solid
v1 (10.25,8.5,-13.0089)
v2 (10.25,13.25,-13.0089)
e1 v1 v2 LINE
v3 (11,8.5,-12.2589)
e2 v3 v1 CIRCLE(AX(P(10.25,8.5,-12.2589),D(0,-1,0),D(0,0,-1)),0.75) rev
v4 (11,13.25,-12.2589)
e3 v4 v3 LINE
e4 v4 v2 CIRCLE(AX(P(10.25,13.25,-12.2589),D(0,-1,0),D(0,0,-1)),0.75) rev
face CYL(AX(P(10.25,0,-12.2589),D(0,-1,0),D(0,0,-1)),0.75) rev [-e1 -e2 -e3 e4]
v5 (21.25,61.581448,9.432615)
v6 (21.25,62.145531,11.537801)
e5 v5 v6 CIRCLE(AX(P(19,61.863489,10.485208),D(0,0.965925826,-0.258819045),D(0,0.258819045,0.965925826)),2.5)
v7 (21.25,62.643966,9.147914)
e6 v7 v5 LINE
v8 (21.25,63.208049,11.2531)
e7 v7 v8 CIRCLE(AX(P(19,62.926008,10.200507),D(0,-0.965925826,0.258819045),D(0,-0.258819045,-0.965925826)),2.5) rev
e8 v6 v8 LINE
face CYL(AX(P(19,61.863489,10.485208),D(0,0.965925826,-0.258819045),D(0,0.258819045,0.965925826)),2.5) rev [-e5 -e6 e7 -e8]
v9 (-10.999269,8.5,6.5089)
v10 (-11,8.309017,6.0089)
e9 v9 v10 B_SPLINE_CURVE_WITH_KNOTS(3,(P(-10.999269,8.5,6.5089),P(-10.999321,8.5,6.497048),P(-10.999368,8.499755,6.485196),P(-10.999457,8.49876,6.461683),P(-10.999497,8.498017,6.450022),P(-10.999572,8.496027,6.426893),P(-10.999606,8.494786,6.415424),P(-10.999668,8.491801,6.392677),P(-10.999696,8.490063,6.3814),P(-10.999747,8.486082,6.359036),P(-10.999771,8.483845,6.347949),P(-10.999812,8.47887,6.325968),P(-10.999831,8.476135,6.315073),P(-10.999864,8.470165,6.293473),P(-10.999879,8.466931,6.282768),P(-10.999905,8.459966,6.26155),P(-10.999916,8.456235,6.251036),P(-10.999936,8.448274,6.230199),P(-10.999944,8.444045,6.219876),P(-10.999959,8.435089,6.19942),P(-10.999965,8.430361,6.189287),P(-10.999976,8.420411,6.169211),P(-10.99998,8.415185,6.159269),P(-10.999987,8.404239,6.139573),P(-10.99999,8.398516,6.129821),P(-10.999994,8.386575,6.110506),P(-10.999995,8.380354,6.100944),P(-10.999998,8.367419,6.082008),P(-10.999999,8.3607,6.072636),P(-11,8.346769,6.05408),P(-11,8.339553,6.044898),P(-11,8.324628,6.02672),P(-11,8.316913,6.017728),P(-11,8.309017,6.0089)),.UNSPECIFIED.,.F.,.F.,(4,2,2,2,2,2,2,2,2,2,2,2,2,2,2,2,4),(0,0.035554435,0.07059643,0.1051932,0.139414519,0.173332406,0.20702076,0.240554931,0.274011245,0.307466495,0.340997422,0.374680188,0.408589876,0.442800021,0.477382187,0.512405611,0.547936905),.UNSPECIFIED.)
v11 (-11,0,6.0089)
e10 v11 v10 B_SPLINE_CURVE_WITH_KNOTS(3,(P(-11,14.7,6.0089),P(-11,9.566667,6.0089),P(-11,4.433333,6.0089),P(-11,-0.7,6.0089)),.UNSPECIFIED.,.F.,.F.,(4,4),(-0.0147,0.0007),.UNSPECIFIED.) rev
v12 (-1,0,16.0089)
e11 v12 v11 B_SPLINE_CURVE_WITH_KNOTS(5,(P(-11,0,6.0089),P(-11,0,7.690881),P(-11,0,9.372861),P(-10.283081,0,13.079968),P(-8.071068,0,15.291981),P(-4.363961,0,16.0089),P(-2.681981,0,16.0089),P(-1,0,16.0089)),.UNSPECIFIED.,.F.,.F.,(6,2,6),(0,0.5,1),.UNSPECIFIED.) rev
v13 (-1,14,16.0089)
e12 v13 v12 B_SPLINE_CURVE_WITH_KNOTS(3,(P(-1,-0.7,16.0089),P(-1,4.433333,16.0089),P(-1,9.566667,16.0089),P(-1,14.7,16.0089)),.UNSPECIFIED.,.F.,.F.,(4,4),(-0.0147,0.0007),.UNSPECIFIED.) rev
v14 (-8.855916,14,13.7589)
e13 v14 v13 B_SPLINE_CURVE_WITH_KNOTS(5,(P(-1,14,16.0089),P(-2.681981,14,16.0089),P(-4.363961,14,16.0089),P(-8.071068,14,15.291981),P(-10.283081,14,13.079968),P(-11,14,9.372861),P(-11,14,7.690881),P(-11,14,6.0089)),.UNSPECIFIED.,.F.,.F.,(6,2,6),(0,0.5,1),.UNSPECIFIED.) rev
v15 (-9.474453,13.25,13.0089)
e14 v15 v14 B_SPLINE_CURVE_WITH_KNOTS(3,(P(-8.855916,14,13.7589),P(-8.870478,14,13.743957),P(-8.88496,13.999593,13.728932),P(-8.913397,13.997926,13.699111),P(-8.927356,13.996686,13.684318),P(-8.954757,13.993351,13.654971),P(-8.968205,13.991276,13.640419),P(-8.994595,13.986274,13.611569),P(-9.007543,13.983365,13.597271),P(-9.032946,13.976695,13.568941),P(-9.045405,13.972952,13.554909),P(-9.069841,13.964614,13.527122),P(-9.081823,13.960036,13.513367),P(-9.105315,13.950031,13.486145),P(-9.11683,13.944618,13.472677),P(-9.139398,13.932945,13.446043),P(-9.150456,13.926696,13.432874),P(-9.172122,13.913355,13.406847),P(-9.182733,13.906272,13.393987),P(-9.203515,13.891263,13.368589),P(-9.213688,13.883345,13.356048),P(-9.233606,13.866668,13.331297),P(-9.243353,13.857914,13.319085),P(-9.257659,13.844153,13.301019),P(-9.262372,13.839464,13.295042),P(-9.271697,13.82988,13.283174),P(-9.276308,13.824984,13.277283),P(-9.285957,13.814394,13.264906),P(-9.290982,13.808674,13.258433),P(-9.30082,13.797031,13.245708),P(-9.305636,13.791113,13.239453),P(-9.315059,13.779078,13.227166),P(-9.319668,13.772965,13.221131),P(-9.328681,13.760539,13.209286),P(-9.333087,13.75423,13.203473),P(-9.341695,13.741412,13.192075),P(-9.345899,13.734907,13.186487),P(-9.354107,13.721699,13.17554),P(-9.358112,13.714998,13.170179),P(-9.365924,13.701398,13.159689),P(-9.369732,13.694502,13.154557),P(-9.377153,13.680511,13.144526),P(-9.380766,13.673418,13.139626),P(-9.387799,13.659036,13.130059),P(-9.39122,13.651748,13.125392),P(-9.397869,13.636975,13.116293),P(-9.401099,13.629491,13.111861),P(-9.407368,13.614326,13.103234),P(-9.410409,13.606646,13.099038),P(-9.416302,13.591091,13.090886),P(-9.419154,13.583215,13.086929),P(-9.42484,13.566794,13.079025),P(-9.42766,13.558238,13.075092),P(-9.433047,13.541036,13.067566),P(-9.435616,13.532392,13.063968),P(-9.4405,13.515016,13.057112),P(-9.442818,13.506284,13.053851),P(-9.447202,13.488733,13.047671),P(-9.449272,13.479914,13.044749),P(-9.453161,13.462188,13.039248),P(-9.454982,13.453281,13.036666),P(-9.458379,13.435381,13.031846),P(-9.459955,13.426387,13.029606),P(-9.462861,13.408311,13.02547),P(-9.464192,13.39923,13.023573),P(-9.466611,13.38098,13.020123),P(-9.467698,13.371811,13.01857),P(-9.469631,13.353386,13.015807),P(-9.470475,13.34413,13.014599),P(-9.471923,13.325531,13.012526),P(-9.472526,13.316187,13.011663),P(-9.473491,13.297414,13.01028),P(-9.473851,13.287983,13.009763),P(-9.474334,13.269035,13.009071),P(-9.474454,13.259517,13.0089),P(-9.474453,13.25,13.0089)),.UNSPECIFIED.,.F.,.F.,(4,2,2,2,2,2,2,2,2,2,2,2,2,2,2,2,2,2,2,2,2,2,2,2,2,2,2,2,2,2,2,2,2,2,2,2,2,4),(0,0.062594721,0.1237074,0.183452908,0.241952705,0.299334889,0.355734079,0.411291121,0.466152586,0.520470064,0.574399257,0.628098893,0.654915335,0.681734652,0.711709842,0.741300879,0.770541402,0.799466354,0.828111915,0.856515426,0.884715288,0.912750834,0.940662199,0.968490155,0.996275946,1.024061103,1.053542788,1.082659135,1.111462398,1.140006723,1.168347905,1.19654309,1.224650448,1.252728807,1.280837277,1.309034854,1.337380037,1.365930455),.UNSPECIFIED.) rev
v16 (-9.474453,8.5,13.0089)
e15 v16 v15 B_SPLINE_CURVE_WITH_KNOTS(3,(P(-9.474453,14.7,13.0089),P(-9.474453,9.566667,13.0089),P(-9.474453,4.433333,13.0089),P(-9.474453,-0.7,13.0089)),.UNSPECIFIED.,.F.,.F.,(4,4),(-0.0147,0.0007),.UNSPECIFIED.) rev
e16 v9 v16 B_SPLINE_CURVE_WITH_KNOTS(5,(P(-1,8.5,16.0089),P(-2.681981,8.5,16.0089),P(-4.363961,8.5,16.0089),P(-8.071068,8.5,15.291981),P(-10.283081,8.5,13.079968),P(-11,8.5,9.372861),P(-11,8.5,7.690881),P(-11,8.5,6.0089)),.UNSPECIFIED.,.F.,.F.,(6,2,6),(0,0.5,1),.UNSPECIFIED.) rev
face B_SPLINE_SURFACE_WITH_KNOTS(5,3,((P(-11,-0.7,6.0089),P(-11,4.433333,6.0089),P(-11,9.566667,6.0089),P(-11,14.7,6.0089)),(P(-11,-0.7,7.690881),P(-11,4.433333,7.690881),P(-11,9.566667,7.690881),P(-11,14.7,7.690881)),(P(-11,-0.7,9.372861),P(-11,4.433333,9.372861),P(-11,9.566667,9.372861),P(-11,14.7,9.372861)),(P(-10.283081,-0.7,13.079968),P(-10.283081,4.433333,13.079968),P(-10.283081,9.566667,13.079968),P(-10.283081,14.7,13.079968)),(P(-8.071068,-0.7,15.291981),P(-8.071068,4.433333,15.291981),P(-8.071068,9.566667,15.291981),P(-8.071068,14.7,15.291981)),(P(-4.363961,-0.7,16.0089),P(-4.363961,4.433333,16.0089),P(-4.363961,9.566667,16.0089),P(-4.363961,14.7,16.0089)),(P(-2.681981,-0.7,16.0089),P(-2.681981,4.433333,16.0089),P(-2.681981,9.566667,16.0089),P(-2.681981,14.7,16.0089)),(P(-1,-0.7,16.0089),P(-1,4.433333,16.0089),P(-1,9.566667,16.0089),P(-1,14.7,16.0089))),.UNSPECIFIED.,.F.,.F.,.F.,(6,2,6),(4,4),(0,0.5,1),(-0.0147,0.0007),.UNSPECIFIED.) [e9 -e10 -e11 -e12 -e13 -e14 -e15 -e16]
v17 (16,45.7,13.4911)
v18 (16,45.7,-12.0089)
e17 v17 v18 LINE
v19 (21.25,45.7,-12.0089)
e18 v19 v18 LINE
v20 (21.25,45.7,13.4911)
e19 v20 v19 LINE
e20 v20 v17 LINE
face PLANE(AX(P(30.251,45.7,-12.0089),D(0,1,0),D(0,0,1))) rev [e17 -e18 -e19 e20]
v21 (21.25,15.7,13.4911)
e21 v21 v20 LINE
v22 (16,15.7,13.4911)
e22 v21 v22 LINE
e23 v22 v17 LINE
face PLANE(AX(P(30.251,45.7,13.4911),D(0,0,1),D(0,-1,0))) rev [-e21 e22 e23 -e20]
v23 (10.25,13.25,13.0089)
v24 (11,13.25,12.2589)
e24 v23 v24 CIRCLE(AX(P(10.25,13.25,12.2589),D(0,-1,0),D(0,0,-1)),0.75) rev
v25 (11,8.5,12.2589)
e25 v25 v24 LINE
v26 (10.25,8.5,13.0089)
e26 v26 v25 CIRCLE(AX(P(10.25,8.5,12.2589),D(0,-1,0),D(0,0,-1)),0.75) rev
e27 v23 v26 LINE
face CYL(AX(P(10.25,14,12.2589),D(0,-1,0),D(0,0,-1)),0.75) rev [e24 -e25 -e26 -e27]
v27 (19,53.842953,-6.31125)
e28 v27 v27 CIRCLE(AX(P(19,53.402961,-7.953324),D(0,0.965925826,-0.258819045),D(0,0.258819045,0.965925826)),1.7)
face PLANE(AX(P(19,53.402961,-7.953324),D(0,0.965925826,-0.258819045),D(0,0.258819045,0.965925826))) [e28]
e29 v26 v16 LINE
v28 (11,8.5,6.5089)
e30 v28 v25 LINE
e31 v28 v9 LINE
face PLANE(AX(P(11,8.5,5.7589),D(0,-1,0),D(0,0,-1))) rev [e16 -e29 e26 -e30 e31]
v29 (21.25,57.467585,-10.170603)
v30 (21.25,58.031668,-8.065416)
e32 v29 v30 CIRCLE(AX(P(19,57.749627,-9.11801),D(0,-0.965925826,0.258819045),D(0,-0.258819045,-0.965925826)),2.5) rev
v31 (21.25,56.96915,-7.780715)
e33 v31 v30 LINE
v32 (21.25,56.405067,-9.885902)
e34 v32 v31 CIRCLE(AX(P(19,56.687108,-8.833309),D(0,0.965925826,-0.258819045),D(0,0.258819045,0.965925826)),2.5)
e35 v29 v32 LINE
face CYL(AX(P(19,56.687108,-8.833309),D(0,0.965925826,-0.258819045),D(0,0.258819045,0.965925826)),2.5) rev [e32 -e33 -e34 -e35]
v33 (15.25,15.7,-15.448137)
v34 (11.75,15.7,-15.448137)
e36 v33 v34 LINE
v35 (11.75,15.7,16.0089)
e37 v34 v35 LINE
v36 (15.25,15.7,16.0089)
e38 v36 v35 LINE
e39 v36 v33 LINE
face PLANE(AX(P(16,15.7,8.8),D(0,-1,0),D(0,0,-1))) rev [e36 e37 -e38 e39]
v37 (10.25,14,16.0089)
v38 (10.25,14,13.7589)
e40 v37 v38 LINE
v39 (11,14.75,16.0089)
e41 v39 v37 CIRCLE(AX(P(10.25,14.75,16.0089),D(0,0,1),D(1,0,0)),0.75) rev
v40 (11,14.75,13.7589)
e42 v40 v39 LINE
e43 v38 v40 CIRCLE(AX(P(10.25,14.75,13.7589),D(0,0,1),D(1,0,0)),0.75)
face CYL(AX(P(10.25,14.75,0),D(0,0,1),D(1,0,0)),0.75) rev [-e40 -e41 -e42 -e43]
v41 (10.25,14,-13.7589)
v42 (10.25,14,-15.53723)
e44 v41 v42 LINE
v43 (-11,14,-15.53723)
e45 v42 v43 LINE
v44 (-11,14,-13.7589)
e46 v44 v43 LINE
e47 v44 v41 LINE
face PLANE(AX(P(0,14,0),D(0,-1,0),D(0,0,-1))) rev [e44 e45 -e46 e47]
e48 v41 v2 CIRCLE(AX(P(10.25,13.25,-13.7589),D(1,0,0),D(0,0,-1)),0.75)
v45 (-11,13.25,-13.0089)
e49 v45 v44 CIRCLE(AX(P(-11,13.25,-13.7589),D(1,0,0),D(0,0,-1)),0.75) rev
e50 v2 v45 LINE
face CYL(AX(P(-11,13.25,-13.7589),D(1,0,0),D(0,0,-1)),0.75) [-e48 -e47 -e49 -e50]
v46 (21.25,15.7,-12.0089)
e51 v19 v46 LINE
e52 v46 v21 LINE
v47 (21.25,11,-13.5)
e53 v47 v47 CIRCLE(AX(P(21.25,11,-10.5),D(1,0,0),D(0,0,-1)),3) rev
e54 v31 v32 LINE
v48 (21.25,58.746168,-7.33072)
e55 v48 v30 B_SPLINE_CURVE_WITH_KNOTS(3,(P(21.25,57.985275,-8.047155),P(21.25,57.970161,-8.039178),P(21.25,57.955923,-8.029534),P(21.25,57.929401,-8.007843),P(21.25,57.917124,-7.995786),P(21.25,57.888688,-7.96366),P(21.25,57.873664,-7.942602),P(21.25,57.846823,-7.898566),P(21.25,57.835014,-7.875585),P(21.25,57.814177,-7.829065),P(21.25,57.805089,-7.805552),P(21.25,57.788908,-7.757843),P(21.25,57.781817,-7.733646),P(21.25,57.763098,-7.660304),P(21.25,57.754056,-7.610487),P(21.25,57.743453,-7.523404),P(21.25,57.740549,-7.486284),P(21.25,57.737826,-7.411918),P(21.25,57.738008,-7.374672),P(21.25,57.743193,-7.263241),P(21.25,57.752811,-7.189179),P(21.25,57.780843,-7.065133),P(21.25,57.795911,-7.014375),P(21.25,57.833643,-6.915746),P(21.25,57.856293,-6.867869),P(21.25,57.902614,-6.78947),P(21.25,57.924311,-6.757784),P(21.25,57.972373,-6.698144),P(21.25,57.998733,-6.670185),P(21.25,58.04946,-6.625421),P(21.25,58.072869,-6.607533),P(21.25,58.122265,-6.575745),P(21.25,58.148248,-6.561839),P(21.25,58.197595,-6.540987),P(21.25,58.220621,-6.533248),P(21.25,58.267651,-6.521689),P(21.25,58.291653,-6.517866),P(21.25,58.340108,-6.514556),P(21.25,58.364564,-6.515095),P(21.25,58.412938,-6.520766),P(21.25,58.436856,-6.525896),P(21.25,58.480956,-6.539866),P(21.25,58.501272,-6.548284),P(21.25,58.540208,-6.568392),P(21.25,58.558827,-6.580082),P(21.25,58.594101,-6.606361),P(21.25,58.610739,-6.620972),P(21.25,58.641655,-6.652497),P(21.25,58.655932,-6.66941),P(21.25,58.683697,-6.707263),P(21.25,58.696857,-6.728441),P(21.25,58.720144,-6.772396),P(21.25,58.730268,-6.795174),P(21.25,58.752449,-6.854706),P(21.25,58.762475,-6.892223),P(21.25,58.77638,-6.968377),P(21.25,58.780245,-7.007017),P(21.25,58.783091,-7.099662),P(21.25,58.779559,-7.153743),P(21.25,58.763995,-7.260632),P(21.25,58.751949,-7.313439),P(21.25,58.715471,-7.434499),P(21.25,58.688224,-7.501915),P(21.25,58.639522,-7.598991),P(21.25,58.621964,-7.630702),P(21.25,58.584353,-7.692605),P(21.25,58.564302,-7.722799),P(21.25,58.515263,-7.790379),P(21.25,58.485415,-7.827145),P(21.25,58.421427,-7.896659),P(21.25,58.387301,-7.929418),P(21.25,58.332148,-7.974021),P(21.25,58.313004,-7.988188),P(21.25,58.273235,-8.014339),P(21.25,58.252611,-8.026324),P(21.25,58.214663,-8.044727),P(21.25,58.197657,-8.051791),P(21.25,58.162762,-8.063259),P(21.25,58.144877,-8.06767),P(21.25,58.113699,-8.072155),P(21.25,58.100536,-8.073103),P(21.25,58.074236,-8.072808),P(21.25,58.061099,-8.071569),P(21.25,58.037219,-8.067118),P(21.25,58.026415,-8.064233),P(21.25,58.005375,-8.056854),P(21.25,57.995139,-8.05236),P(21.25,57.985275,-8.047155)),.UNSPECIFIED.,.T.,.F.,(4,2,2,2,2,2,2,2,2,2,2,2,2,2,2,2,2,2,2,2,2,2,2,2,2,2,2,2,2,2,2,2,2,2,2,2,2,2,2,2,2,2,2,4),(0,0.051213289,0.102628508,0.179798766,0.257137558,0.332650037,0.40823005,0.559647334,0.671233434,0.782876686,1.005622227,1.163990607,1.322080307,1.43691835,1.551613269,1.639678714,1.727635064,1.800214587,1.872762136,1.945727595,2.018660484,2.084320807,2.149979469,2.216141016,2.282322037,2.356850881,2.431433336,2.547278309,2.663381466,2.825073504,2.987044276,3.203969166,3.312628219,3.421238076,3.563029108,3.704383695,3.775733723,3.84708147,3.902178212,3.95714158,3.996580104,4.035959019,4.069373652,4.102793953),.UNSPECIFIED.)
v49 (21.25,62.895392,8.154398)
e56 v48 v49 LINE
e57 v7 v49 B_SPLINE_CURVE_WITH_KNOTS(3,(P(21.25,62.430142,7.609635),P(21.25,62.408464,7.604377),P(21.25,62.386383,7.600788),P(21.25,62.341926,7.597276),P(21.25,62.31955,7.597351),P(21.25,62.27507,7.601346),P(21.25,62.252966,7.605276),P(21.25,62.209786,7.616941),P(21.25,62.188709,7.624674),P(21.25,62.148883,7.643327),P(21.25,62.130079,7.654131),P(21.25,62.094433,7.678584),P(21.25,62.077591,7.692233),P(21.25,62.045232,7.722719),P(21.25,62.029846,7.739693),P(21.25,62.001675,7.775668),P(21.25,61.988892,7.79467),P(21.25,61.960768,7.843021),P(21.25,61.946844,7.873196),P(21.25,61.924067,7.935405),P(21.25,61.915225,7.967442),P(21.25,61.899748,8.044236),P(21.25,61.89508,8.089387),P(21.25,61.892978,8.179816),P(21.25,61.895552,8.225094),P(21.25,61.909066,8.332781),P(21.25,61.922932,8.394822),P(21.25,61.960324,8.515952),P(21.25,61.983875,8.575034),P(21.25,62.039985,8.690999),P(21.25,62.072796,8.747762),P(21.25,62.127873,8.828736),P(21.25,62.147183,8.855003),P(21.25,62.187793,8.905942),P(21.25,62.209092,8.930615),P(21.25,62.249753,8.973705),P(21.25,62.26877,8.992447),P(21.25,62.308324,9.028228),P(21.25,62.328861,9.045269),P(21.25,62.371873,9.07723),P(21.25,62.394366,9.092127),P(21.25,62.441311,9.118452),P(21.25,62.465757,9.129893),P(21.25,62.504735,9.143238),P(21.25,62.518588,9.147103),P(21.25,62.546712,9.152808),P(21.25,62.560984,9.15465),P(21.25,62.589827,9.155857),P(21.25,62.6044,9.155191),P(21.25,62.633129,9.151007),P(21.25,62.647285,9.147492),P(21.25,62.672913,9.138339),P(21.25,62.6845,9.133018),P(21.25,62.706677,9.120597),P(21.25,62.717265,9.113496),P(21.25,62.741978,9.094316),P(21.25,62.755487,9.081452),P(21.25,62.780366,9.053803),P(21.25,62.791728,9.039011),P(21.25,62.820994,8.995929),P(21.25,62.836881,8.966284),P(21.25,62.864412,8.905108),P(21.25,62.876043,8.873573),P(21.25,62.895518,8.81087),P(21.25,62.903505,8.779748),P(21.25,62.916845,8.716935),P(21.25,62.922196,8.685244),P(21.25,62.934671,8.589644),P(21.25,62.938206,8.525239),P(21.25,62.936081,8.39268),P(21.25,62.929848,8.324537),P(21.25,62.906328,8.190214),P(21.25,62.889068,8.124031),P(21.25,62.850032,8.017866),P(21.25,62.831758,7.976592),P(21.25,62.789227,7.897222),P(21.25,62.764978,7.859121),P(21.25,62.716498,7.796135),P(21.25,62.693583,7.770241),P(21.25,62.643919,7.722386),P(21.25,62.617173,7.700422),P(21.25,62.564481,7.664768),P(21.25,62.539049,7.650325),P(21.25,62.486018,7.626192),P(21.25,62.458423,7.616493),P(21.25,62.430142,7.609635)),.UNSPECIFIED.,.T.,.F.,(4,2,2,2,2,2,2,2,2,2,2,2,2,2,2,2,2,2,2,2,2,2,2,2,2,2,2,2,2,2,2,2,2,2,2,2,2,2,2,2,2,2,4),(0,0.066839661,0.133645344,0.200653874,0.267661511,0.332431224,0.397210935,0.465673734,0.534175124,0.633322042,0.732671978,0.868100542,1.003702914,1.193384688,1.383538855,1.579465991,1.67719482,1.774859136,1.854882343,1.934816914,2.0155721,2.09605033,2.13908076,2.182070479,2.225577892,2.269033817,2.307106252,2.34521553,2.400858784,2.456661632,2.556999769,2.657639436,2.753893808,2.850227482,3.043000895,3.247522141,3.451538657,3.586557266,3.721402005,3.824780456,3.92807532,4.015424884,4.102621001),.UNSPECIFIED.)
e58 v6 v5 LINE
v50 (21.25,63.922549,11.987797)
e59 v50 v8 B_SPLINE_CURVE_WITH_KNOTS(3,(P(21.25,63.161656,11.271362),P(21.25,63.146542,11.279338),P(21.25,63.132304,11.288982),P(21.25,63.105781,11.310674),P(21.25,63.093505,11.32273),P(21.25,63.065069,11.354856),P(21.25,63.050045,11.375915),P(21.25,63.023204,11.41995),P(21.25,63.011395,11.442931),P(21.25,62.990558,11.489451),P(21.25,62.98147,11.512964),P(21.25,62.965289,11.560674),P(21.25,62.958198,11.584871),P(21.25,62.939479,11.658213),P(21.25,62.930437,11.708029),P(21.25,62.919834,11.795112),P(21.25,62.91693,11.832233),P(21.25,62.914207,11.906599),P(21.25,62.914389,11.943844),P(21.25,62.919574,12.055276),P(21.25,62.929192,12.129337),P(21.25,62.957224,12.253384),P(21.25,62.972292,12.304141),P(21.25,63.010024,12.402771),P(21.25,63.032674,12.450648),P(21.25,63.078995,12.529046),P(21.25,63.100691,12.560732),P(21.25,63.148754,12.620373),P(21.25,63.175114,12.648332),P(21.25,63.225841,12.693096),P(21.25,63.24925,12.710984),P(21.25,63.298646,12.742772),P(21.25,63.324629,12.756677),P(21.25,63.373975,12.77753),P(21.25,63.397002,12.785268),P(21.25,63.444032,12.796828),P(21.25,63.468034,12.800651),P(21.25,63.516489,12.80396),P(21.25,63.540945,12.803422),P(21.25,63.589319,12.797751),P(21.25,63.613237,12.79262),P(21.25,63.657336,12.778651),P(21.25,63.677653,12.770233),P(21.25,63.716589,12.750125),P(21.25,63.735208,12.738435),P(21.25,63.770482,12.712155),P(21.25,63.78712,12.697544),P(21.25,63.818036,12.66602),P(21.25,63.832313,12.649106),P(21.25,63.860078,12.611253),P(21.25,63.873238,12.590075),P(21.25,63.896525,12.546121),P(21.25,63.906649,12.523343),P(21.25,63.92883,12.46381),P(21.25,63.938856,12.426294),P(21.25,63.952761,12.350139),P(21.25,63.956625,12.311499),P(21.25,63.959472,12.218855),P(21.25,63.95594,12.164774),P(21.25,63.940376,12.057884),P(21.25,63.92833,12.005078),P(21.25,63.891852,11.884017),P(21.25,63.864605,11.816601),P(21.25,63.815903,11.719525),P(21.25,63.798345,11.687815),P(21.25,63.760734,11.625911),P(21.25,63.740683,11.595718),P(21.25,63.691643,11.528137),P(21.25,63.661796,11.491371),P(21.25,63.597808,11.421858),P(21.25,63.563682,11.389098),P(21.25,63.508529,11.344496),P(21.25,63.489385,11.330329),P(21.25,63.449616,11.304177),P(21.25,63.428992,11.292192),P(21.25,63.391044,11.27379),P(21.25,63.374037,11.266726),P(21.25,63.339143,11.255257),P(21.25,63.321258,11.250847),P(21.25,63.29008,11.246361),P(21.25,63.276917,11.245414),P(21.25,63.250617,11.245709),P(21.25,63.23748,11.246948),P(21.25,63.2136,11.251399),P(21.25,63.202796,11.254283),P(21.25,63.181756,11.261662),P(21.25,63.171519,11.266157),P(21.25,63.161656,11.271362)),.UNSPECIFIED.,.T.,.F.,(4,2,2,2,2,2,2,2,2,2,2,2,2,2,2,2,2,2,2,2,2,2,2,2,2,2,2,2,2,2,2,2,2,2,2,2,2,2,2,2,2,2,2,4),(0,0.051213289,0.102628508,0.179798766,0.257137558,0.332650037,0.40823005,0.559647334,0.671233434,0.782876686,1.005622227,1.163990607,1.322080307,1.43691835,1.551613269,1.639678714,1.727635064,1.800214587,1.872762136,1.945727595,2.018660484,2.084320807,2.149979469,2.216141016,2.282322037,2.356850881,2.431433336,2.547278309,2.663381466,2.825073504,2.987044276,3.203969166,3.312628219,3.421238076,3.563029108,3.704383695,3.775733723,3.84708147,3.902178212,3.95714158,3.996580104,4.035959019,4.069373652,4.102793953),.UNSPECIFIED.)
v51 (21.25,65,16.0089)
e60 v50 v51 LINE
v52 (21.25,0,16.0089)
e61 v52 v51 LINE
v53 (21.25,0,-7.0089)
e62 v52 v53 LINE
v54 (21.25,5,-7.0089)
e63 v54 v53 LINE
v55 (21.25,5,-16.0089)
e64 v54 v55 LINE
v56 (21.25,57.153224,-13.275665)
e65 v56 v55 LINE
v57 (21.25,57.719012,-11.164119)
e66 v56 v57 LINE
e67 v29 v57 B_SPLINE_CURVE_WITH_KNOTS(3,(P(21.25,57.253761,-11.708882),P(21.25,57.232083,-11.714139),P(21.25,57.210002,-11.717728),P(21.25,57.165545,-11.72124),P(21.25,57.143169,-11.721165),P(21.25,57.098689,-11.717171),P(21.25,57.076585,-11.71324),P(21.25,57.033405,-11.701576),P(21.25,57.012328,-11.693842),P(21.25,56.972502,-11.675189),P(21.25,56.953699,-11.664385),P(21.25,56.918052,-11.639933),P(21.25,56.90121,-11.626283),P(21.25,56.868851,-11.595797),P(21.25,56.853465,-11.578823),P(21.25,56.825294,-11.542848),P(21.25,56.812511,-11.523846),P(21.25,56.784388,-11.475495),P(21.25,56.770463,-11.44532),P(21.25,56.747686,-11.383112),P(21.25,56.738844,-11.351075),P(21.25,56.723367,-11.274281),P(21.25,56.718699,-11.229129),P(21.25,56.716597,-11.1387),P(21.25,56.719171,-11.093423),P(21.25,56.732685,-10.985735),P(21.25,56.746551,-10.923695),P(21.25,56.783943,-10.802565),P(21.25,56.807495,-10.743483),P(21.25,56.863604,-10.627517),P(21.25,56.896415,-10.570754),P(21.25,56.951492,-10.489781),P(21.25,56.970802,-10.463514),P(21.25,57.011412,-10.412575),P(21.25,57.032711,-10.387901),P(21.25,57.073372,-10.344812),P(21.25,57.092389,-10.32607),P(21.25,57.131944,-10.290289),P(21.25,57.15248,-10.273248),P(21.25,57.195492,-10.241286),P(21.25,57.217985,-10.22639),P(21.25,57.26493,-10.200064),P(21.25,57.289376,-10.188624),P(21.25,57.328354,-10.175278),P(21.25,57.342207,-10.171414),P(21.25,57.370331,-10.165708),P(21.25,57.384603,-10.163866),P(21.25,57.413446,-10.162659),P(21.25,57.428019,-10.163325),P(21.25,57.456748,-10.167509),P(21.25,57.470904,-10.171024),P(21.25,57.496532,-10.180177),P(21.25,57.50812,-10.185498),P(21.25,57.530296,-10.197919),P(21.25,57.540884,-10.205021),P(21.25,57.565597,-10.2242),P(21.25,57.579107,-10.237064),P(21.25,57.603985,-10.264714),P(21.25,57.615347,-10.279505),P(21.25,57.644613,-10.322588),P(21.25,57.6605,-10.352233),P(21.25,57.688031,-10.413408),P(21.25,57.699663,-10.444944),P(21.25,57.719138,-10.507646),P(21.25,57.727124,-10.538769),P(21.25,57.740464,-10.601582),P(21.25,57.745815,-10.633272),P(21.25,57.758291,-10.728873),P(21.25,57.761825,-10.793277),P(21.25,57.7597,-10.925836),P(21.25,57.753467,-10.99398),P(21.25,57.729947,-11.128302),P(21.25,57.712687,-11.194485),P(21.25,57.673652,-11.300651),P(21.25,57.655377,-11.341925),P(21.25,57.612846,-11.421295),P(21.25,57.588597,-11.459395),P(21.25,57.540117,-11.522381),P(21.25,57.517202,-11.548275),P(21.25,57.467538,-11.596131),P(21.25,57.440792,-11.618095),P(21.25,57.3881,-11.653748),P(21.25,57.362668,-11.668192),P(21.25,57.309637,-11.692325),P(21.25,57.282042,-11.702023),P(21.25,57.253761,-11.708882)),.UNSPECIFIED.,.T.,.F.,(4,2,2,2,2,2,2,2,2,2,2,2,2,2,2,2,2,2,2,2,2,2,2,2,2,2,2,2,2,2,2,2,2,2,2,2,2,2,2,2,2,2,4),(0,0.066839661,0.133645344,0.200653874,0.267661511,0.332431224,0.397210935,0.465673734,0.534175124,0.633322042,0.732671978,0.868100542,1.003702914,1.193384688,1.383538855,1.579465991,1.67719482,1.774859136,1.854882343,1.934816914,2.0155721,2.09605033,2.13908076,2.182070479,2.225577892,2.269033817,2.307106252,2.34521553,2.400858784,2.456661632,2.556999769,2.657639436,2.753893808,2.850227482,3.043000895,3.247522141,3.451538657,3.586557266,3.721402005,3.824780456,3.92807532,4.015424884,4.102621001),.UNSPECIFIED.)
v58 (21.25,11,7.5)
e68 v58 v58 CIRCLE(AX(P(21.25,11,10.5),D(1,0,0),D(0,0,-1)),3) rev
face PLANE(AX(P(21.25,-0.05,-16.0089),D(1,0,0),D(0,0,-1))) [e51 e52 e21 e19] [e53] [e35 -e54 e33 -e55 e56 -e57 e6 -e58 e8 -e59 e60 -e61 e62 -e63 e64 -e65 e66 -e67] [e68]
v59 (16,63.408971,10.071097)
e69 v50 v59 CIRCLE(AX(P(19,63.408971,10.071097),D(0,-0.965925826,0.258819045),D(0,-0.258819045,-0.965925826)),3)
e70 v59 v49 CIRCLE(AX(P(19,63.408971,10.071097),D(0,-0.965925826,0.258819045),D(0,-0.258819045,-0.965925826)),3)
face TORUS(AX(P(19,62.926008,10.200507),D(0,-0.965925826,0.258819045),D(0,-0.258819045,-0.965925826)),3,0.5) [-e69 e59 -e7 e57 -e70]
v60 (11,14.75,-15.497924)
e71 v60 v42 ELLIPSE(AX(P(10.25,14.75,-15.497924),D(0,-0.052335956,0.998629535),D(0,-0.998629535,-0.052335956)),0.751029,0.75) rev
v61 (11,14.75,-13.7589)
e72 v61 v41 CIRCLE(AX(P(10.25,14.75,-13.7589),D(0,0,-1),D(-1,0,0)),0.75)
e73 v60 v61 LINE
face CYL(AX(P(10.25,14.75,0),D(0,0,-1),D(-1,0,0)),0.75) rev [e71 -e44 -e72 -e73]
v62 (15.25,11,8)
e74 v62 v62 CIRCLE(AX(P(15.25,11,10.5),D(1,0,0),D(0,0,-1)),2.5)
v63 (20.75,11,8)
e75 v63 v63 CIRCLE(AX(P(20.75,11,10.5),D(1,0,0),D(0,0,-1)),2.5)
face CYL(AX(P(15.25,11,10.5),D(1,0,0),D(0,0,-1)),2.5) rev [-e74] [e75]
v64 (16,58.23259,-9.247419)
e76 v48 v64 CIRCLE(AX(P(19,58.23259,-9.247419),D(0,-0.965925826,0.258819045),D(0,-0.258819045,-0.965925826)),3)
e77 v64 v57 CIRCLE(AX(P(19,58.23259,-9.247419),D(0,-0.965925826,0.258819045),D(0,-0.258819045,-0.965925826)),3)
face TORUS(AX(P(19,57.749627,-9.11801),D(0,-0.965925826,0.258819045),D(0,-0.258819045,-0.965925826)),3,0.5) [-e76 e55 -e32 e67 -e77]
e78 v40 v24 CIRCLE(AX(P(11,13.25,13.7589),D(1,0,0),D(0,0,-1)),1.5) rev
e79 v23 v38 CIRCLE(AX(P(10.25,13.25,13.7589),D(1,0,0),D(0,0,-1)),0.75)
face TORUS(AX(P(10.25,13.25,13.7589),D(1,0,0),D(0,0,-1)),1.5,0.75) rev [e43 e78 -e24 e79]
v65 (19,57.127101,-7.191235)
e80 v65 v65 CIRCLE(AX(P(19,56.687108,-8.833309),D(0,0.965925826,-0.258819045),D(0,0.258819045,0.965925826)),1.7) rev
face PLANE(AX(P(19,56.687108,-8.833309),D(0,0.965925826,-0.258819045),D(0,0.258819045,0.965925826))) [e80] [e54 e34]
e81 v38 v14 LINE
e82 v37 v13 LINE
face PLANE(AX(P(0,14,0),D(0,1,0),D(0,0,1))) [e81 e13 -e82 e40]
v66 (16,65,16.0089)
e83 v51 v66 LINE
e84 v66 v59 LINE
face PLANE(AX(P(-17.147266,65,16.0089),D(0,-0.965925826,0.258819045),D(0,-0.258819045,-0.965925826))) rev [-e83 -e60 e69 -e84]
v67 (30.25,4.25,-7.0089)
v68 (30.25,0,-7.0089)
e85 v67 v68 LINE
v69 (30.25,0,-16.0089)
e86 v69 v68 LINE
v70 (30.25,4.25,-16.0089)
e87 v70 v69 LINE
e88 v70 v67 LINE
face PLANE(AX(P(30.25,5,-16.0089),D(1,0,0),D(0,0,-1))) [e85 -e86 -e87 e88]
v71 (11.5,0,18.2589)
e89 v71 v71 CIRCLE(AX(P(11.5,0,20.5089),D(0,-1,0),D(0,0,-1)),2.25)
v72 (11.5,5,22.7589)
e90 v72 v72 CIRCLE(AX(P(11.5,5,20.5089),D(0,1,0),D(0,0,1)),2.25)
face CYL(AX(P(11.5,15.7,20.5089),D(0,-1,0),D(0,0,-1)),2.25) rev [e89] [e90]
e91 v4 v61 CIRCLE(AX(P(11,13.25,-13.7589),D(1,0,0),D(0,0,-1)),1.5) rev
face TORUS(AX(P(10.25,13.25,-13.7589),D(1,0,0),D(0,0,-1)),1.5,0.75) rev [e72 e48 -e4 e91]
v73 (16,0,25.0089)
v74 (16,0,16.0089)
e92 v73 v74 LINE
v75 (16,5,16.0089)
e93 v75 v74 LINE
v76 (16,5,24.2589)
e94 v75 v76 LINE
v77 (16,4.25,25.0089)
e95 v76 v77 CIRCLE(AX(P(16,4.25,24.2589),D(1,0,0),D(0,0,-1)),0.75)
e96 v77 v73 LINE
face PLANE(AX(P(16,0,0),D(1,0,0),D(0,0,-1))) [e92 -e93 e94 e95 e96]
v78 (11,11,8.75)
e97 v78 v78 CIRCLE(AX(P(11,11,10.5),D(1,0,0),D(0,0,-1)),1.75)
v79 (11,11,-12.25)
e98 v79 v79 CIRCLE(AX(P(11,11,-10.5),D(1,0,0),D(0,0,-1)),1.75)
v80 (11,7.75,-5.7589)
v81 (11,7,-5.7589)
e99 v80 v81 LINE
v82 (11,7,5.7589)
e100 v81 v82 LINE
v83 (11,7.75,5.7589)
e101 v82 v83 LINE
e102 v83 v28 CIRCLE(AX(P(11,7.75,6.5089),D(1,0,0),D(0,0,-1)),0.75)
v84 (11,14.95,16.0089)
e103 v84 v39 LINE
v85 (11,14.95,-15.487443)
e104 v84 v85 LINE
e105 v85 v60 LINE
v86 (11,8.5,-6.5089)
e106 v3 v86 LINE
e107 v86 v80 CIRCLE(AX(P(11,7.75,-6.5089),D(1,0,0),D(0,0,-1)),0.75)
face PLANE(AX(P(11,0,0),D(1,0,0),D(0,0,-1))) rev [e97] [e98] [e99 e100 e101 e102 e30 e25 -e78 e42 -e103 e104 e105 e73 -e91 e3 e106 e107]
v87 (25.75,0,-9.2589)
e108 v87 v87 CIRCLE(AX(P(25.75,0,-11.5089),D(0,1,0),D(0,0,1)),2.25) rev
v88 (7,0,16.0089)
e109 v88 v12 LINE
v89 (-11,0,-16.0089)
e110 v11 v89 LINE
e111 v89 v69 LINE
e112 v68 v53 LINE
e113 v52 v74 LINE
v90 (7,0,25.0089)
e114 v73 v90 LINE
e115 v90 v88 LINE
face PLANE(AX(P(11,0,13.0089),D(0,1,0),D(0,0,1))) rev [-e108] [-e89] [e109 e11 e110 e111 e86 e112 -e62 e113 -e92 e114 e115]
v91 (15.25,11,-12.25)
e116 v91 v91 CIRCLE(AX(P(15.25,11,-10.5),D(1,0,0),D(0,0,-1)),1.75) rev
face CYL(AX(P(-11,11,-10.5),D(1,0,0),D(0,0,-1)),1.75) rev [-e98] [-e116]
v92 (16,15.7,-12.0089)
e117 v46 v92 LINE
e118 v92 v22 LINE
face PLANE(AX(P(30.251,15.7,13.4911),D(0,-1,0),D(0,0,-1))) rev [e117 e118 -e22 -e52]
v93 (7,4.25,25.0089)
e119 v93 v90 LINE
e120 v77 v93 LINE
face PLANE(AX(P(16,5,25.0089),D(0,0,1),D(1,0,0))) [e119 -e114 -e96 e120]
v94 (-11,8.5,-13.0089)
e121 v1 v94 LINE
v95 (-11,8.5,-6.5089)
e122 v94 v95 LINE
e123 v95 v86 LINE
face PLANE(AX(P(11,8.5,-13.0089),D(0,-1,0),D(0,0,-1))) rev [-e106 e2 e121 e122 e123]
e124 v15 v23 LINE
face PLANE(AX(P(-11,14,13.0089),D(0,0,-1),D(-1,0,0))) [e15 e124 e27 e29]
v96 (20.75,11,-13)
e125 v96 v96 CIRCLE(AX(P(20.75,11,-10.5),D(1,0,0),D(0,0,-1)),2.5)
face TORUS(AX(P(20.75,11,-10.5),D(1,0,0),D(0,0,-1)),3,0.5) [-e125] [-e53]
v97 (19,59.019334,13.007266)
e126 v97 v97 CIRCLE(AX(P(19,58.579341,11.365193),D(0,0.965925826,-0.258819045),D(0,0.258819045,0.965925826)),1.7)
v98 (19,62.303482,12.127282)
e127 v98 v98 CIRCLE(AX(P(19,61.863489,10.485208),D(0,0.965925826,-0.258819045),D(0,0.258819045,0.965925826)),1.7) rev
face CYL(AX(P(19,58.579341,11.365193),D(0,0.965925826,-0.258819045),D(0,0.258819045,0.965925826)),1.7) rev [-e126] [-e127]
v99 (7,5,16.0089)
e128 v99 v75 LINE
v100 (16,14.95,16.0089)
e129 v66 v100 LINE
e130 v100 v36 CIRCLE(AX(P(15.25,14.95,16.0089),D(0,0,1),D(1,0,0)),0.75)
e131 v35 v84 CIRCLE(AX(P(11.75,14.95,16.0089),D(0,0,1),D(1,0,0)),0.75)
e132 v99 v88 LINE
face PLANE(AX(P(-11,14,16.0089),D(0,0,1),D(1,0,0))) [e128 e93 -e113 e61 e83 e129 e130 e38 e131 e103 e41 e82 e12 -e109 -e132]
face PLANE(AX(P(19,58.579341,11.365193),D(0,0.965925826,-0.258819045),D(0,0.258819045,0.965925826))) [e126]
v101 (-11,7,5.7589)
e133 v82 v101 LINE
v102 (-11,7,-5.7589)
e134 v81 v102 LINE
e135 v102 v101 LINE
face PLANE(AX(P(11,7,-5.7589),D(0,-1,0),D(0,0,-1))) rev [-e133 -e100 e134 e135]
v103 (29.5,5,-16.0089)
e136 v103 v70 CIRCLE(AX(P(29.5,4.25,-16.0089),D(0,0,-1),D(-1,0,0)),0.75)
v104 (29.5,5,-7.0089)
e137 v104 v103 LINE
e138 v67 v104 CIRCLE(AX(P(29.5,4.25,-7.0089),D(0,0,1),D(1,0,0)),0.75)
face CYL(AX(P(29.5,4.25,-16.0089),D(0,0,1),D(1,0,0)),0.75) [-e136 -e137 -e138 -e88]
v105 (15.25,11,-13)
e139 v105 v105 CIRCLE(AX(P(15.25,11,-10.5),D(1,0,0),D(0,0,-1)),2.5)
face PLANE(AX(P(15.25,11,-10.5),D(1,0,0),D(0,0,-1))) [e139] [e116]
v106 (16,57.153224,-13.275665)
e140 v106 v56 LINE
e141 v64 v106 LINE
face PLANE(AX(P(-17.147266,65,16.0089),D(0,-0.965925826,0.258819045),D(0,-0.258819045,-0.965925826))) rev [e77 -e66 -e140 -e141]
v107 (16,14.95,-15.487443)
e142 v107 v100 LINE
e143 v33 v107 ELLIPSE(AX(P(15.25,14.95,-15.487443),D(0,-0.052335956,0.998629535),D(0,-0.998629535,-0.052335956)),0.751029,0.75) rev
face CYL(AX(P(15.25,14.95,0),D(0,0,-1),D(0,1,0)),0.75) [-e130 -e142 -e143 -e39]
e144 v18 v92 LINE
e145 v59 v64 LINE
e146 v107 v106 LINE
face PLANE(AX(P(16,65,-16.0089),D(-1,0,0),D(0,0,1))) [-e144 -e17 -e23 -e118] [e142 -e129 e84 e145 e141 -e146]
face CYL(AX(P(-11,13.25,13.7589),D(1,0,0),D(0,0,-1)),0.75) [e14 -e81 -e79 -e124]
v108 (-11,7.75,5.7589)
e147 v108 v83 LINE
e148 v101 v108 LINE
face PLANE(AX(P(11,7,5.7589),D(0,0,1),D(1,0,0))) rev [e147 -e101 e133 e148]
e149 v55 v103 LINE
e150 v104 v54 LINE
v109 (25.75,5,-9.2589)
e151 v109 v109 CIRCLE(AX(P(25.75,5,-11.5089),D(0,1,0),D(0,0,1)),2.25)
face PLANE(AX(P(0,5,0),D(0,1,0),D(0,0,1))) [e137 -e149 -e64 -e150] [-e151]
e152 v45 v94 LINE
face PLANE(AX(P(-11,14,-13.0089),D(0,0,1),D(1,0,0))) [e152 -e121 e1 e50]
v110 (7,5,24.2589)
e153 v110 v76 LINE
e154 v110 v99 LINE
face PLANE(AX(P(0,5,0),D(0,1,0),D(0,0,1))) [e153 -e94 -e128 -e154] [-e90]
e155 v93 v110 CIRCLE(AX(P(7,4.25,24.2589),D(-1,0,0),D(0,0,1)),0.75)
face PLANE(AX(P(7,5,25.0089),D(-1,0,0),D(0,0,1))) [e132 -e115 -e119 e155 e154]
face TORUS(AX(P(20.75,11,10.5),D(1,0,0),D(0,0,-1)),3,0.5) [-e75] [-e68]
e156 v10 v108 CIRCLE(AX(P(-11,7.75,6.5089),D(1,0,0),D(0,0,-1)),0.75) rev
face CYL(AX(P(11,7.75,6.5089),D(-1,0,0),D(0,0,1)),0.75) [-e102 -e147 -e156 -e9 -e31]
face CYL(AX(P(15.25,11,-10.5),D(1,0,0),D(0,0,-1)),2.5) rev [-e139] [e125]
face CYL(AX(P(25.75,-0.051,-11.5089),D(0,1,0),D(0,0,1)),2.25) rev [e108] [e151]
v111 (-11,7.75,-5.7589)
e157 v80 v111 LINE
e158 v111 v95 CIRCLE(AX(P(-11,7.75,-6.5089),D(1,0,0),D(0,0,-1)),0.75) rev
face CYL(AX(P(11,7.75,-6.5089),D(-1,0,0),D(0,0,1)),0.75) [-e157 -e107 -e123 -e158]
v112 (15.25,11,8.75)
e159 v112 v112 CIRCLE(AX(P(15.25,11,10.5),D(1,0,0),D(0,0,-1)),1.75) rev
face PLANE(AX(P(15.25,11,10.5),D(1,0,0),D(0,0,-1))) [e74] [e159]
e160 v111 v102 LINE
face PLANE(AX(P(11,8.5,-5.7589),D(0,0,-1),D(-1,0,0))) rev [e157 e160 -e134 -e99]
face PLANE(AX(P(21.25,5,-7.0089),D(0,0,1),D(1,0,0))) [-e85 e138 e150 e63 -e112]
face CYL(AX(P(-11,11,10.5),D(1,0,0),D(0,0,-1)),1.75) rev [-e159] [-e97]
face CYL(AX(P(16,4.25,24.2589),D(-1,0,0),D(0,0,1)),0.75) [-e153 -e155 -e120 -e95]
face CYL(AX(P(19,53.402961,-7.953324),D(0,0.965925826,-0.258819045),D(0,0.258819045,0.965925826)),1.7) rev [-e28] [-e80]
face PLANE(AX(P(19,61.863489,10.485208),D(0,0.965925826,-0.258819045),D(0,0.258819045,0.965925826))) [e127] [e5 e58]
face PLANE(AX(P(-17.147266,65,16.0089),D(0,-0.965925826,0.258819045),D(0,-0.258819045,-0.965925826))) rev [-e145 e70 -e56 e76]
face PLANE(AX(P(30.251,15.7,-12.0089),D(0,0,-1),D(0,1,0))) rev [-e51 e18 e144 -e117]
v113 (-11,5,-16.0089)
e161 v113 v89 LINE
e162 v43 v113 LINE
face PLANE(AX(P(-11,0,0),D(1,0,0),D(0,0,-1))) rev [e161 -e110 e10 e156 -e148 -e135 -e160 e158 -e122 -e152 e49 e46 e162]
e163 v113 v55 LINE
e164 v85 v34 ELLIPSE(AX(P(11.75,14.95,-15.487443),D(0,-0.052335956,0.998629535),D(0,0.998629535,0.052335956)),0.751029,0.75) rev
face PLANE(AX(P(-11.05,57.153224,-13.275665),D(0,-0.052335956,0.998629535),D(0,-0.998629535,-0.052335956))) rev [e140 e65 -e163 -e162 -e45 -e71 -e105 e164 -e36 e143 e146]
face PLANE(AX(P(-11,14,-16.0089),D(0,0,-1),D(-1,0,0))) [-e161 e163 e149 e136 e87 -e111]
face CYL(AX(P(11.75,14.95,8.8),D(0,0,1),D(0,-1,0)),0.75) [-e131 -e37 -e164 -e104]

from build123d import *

# Parameters (mm, degrees)
BOSS_EXTRUDE1_DEPTH = 11
SKETCH3_W           = 22
SKETCH3_H           = 3
BOSS_EXTRUDE2_DEPTH = 14
BOSS_EXTRUDE3_DEPTH = 5
SKETCH5_R           = 1.75
CUT_EXTRUDE1_DEPTH  = 36.096650541
SKETCH6_W           = 9
SKETCH6_H           = 9
BOSS_EXTRUDE4_DEPTH = 5
SKETCH10_R          = 2.25
CUT_EXTRUDE2_DEPTH  = 34.584744739
FILLET1_R           = 0.75
FILLET2_SIZE        = 10
SKETCH12_W          = 9
SKETCH12_H          = 32.0178
BOSS_EXTRUDE5_DEPTH = 65
CUT_EXTRUDE4_DEPTH  = 9
SKETCH14_R          = 2.5
CUT_EXTRUDE5_DEPTH  = 9.75
SKETCH15_R          = 1.7
CUT_EXTRUDE6_DEPTH  = 5
SKETCH16_R          = 2.5
CUT_EXTRUDE7_DEPTH  = 1.6
FILLET3_R           = 0.5
FILLET4_R           = 0.5
SKETCH17_W          = 3.75
SKETCH17_H          = 32.0178
CUT_EXTRUDE9_DEPTH  = 74.996250596
SKETCH18_W          = 9
SKETCH18_H          = 9
BOSS_EXTRUDE6_DEPTH = 5
CUT_EXTRUDE10_REACH = 73.697
SKETCH19_R          = 2.25
FILLET6_START       = -17
FILLET6_DEPTH       = 11
CUT_EXTRUDE11_REACH = 76.696
SKETCH20_W          = 25.5
SKETCH20_H          = 30
CUT_EXTRUDE12_DEPTH = 77.749642368


with BuildPart() as part:
    # Sketch1 → Boss-Extrude1 (new, symmetric)
    with BuildSketch(Plane(origin=(0, 0, 0), x_dir=(0, 0, -1), z_dir=(1, 0, 0))):
        Polygon((-13.0089, 0), (13.0089, 0), (13.0089, 8.5), (5.7589, 8.5), (5.7589, 7), (-5.7589, 7), (-5.7589, 8.5), (-13.0089, 8.5), align=None)
    extrude(amount=BOSS_EXTRUDE1_DEPTH, both=True)

    # Sketch3 → Boss-Extrude2 (add)
    with BuildSketch(Plane.XZ):
        with Locations((0, -14.5089)):
            Rectangle(SKETCH3_W, SKETCH3_H)
        with Locations((0, 14.5089)):
            Rectangle(SKETCH3_W, SKETCH3_H)
    extrude(amount=-BOSS_EXTRUDE2_DEPTH)

    # Sketch4 → Boss-Extrude3 (add)
    with BuildSketch(Plane(origin=(11, 0, 0), x_dir=(0, 0, -1), z_dir=(1, 0, 0))):
        Polygon((-8.8, 15.7), (-16.0089, 15.7), (-16.0089, 0), (16.0089, 0), (16.0089, 15.7), align=None)
    extrude(amount=BOSS_EXTRUDE3_DEPTH)

    # Sketch5 → Cut-Extrude1 (cut, through all)
    with BuildSketch(Plane(origin=(16, 0, 0), x_dir=(0, 0, -1), z_dir=(1, 0, 0))):
        with Locations((-10.5, 11)):
            Circle(SKETCH5_R)
        with Locations((10.5, 11)):
            Circle(SKETCH5_R)
    extrude(amount=-CUT_EXTRUDE1_DEPTH, mode=Mode.SUBTRACT)

    # Sketch6 → Boss-Extrude4 (add)
    with BuildSketch(Plane.XZ):
        with Locations((11.5, 20.5089)):
            Rectangle(SKETCH6_W, SKETCH6_H)
    extrude(amount=-BOSS_EXTRUDE4_DEPTH)

    # Sketch10 → Cut-Extrude2 (cut, through all)
    with BuildSketch(Plane.XZ):
        with Locations(Location((11.5, 20.5089, 0), (0, 0, 270))):
            Circle(SKETCH10_R)
    extrude(amount=-CUT_EXTRUDE2_DEPTH, mode=Mode.SUBTRACT)

    # Fillet1
    fillet1_edges = [part.edges().sort_by_distance(p)[0] for p in [
        (0, 8.5, 5.7589),
        (0, 8.5, -5.7589),
        (0, 14, -13.0089),
        (11, 14, -14.5089),
        (11, 11.25, -13.0089),
        (11, 14, 14.5089),
        (11, 11.25, 13.0089),
        (0, 14, 13.0089),
        (11, 15.7, 0),
        (16, 15.7, 0),
        (11.5, 5, 25.0089),
    ]]
    fillet(fillet1_edges, radius=FILLET1_R)

    # Fillet2
    # a fillet whose section is not a circle: 10 mm, written as the material it takes off along each edge
    with BuildSketch(Plane(origin=(-11, -25, 16.0089), x_dir=(0, 0, -1), z_dir=(0, 1, 0))) as fillet2_piece_1:
        with BuildLine():
            add(Edge.make_bspline([(FILLET2_SIZE, 0), (FILLET2_SIZE * 0.831801948466, 0), (FILLET2_SIZE * 0.663603896932, 0), (FILLET2_SIZE * 0.292893218813, -FILLET2_SIZE * 0.0716919198361), (FILLET2_SIZE * 0.0716919198361, -FILLET2_SIZE * 0.292893218813), (0, -FILLET2_SIZE * 0.663603896932), (0, -FILLET2_SIZE * 0.831801948466), (0, -FILLET2_SIZE)], knots=[0, 0, 0, 0, 0, 0, 0.5, 0.5, 1, 1, 1, 1, 1, 1], degree=5))
            Line((0, -FILLET2_SIZE), (0, 0))
            Line((0, 0), (FILLET2_SIZE, 0))
        make_face()
    extrude(amount=64, mode=Mode.SUBTRACT)

    # Sketch12 → Boss-Extrude5 (add)
    with BuildSketch(Plane.XZ):
        with Locations((20.5, 0)):
            Rectangle(SKETCH12_W, SKETCH12_H)
    extrude(amount=-BOSS_EXTRUDE5_DEPTH)

    # Sketch13 → Cut-Extrude4 (cut)
    with BuildSketch(Plane(origin=(25, 0, 0), x_dir=(0, 0, -1), z_dir=(1, 0, 0))):
        Polygon((16.0089, 65), (-16.0089, 65), (16.0089, 56.420856347), align=None)
    extrude(amount=-CUT_EXTRUDE4_DEPTH, mode=Mode.SUBTRACT)

    # Sketch14 → Cut-Extrude5 (cut)
    with BuildSketch(Plane(origin=(25, 0, 0), x_dir=(0, 0, -1), z_dir=(1, 0, 0))):
        with Locations((-10.5, 11)):
            Circle(SKETCH14_R)
        with Locations((10.5, 11)):
            Circle(SKETCH14_R)
    extrude(amount=-CUT_EXTRUDE5_DEPTH, mode=Mode.SUBTRACT)

    # Sketch15 → Cut-Extrude6 (cut)
    with BuildSketch(Plane(origin=(0, 56.643600623, -15.177607043), x_dir=(1, 0, 0), z_dir=(0, 0.9659258262890701, -0.25881904510251424))):
        with Locations(Location((19, -6.139382203, 0), (0, 0, 270))):
            Circle(SKETCH15_R)
        with Locations(Location((19, -26.139382203, 0), (0, 0, 270))):
            Circle(SKETCH15_R)
    extrude(amount=-CUT_EXTRUDE6_DEPTH, mode=Mode.SUBTRACT)

    # Sketch16 → Cut-Extrude7 (cut)
    with BuildSketch(Plane(origin=(0, 56.643600623, -15.177607043), x_dir=(1, 0, 0), z_dir=(0, 0.9659258262890701, -0.25881904510251424))):
        with Locations(Location((19, -6.139382203, 0), (0, 0, 270))):
            Circle(SKETCH16_R)
        with Locations(Location((19, -26.139382203, 0), (0, 0, 270))):
            Circle(SKETCH16_R)
    extrude(amount=-CUT_EXTRUDE7_DEPTH, mode=Mode.SUBTRACT)

    # Fillet3
    fillet3_edges = [part.edges().sort_by_distance(p)[0] for p in [
        (19, 57.58554205, -11.662233782),
        (19, 62.761922952, 7.656282744),
    ]]
    fillet(fillet3_edges, radius=FILLET3_R)

    # Fillet4
    fillet4_edges = [part.edges().sort_by_distance(p)[0] for p in [
        (25, 11, 13),
        (25, 11, -8),
    ]]
    fillet(fillet4_edges, radius=FILLET4_R)

    # Sketch17 → Cut-Extrude9 (cut, through all)
    with BuildSketch(Plane(origin=(0, 65, 0), x_dir=(-1, 0, 0), z_dir=(0, -1, 0))):
        with Locations((-23.125, 0)):
            Rectangle(SKETCH17_W, SKETCH17_H)
    extrude(amount=CUT_EXTRUDE9_DEPTH, mode=Mode.SUBTRACT)

    # Fillet5: read off the stored shape, not the designer's step
    # Fillet5 outline → Fillet5 (revolve, cut)
    with BuildSketch(Plane(origin=(0, 11, -10.5), x_dir=(0, 1, 0), z_dir=(0, 0, -1))):
        with BuildLine():
            ThreePointArc((2.5, 20.75), (2.646446609, 21.103553391), (3, 21.25))
            Line((3, 21.25), (2.5, 21.25))
            Line((2.5, 21.25), (2.5, 20.75))
        make_face()
    revolve(axis=Axis((0, 11, -10.5), (1, 0, 0)), mode=Mode.SUBTRACT)

    # Fillet5 2 outline → Fillet5 2 (revolve, cut)
    with BuildSketch(Plane(origin=(0, 11, 10.5), x_dir=(0, 1, 0), z_dir=(0, 0, -1))):
        with BuildLine():
            ThreePointArc((2.5, 20.75), (2.646446609, 21.103553391), (3, 21.25))
            Line((3, 21.25), (2.5, 21.25))
            Line((2.5, 21.25), (2.5, 20.75))
        make_face()
    revolve(axis=Axis((0, 11, 10.5), (1, 0, 0)), mode=Mode.SUBTRACT)

    # Sketch18 → Boss-Extrude6 (add)
    with BuildSketch(Plane.XZ):
        with Locations((25.75, -11.5089)):
            Rectangle(SKETCH18_W, SKETCH18_H)
    extrude(amount=-BOSS_EXTRUDE6_DEPTH)

    # Sketch19 → Cut-Extrude10 (cut, up to next)
    with BuildSketch(Plane(origin=(0, 5, 0), x_dir=(1, 0, 0), z_dir=(0, 1, 0)), mode=Mode.PRIVATE) as cut_extrude10_sk1:
        with Locations(Location((25.75, 11.5089, 0), (0, 0, 270))):
            Circle(SKETCH19_R)
    cut_extrude10_tool1 = extrude(cut_extrude10_sk1.sketch, amount=-CUT_EXTRUDE10_REACH, mode=Mode.PRIVATE) & part.part
    add(cut_extrude10_tool1.solids().sort_by_distance((25.75, 5, -11.5089))[0], mode=Mode.SUBTRACT)

    # Fillet6: read off the stored shape, not the designer's step
    # Fillet6 outline → Fillet6 (cut)
    with BuildSketch(Plane.XY.offset(FILLET6_START)):
        with BuildLine():
            ThreePointArc((29.5, 5), (30.030330086, 4.780330086), (30.25, 4.25))
            Line((30.25, 4.25), (30.25, 5))
            Line((30.25, 5), (29.5, 5))
        make_face()
    extrude(amount=FILLET6_DEPTH, mode=Mode.SUBTRACT)

    # Sketch20 → Cut-Extrude11 (cut, up to next)
    with BuildSketch(Plane.ZY.offset(-16), mode=Mode.PRIVATE) as cut_extrude11_sk1:
        with Locations((0.7411, 30.7)):
            Rectangle(SKETCH20_W, SKETCH20_H)
    cut_extrude11_tool1 = extrude(cut_extrude11_sk1.sketch, amount=-CUT_EXTRUDE11_REACH, mode=Mode.PRIVATE) & part.part
    add(cut_extrude11_tool1.solids().sort_by_distance((16, 30.7, 0.7411))[0], mode=Mode.SUBTRACT)

    # Sketch21 → Cut-Extrude12 (cut, through all)
    with BuildSketch(Plane(origin=(21.25, 0, 0), x_dir=(0, 0, -1), z_dir=(1, 0, 0))):
        Polygon((16.0089, 5), (16.0089, 56.420856347), (13.275665328, 57.15322437), align=None)
    extrude(amount=-CUT_EXTRUDE12_DEPTH, mode=Mode.SUBTRACT)


solid = part.part
